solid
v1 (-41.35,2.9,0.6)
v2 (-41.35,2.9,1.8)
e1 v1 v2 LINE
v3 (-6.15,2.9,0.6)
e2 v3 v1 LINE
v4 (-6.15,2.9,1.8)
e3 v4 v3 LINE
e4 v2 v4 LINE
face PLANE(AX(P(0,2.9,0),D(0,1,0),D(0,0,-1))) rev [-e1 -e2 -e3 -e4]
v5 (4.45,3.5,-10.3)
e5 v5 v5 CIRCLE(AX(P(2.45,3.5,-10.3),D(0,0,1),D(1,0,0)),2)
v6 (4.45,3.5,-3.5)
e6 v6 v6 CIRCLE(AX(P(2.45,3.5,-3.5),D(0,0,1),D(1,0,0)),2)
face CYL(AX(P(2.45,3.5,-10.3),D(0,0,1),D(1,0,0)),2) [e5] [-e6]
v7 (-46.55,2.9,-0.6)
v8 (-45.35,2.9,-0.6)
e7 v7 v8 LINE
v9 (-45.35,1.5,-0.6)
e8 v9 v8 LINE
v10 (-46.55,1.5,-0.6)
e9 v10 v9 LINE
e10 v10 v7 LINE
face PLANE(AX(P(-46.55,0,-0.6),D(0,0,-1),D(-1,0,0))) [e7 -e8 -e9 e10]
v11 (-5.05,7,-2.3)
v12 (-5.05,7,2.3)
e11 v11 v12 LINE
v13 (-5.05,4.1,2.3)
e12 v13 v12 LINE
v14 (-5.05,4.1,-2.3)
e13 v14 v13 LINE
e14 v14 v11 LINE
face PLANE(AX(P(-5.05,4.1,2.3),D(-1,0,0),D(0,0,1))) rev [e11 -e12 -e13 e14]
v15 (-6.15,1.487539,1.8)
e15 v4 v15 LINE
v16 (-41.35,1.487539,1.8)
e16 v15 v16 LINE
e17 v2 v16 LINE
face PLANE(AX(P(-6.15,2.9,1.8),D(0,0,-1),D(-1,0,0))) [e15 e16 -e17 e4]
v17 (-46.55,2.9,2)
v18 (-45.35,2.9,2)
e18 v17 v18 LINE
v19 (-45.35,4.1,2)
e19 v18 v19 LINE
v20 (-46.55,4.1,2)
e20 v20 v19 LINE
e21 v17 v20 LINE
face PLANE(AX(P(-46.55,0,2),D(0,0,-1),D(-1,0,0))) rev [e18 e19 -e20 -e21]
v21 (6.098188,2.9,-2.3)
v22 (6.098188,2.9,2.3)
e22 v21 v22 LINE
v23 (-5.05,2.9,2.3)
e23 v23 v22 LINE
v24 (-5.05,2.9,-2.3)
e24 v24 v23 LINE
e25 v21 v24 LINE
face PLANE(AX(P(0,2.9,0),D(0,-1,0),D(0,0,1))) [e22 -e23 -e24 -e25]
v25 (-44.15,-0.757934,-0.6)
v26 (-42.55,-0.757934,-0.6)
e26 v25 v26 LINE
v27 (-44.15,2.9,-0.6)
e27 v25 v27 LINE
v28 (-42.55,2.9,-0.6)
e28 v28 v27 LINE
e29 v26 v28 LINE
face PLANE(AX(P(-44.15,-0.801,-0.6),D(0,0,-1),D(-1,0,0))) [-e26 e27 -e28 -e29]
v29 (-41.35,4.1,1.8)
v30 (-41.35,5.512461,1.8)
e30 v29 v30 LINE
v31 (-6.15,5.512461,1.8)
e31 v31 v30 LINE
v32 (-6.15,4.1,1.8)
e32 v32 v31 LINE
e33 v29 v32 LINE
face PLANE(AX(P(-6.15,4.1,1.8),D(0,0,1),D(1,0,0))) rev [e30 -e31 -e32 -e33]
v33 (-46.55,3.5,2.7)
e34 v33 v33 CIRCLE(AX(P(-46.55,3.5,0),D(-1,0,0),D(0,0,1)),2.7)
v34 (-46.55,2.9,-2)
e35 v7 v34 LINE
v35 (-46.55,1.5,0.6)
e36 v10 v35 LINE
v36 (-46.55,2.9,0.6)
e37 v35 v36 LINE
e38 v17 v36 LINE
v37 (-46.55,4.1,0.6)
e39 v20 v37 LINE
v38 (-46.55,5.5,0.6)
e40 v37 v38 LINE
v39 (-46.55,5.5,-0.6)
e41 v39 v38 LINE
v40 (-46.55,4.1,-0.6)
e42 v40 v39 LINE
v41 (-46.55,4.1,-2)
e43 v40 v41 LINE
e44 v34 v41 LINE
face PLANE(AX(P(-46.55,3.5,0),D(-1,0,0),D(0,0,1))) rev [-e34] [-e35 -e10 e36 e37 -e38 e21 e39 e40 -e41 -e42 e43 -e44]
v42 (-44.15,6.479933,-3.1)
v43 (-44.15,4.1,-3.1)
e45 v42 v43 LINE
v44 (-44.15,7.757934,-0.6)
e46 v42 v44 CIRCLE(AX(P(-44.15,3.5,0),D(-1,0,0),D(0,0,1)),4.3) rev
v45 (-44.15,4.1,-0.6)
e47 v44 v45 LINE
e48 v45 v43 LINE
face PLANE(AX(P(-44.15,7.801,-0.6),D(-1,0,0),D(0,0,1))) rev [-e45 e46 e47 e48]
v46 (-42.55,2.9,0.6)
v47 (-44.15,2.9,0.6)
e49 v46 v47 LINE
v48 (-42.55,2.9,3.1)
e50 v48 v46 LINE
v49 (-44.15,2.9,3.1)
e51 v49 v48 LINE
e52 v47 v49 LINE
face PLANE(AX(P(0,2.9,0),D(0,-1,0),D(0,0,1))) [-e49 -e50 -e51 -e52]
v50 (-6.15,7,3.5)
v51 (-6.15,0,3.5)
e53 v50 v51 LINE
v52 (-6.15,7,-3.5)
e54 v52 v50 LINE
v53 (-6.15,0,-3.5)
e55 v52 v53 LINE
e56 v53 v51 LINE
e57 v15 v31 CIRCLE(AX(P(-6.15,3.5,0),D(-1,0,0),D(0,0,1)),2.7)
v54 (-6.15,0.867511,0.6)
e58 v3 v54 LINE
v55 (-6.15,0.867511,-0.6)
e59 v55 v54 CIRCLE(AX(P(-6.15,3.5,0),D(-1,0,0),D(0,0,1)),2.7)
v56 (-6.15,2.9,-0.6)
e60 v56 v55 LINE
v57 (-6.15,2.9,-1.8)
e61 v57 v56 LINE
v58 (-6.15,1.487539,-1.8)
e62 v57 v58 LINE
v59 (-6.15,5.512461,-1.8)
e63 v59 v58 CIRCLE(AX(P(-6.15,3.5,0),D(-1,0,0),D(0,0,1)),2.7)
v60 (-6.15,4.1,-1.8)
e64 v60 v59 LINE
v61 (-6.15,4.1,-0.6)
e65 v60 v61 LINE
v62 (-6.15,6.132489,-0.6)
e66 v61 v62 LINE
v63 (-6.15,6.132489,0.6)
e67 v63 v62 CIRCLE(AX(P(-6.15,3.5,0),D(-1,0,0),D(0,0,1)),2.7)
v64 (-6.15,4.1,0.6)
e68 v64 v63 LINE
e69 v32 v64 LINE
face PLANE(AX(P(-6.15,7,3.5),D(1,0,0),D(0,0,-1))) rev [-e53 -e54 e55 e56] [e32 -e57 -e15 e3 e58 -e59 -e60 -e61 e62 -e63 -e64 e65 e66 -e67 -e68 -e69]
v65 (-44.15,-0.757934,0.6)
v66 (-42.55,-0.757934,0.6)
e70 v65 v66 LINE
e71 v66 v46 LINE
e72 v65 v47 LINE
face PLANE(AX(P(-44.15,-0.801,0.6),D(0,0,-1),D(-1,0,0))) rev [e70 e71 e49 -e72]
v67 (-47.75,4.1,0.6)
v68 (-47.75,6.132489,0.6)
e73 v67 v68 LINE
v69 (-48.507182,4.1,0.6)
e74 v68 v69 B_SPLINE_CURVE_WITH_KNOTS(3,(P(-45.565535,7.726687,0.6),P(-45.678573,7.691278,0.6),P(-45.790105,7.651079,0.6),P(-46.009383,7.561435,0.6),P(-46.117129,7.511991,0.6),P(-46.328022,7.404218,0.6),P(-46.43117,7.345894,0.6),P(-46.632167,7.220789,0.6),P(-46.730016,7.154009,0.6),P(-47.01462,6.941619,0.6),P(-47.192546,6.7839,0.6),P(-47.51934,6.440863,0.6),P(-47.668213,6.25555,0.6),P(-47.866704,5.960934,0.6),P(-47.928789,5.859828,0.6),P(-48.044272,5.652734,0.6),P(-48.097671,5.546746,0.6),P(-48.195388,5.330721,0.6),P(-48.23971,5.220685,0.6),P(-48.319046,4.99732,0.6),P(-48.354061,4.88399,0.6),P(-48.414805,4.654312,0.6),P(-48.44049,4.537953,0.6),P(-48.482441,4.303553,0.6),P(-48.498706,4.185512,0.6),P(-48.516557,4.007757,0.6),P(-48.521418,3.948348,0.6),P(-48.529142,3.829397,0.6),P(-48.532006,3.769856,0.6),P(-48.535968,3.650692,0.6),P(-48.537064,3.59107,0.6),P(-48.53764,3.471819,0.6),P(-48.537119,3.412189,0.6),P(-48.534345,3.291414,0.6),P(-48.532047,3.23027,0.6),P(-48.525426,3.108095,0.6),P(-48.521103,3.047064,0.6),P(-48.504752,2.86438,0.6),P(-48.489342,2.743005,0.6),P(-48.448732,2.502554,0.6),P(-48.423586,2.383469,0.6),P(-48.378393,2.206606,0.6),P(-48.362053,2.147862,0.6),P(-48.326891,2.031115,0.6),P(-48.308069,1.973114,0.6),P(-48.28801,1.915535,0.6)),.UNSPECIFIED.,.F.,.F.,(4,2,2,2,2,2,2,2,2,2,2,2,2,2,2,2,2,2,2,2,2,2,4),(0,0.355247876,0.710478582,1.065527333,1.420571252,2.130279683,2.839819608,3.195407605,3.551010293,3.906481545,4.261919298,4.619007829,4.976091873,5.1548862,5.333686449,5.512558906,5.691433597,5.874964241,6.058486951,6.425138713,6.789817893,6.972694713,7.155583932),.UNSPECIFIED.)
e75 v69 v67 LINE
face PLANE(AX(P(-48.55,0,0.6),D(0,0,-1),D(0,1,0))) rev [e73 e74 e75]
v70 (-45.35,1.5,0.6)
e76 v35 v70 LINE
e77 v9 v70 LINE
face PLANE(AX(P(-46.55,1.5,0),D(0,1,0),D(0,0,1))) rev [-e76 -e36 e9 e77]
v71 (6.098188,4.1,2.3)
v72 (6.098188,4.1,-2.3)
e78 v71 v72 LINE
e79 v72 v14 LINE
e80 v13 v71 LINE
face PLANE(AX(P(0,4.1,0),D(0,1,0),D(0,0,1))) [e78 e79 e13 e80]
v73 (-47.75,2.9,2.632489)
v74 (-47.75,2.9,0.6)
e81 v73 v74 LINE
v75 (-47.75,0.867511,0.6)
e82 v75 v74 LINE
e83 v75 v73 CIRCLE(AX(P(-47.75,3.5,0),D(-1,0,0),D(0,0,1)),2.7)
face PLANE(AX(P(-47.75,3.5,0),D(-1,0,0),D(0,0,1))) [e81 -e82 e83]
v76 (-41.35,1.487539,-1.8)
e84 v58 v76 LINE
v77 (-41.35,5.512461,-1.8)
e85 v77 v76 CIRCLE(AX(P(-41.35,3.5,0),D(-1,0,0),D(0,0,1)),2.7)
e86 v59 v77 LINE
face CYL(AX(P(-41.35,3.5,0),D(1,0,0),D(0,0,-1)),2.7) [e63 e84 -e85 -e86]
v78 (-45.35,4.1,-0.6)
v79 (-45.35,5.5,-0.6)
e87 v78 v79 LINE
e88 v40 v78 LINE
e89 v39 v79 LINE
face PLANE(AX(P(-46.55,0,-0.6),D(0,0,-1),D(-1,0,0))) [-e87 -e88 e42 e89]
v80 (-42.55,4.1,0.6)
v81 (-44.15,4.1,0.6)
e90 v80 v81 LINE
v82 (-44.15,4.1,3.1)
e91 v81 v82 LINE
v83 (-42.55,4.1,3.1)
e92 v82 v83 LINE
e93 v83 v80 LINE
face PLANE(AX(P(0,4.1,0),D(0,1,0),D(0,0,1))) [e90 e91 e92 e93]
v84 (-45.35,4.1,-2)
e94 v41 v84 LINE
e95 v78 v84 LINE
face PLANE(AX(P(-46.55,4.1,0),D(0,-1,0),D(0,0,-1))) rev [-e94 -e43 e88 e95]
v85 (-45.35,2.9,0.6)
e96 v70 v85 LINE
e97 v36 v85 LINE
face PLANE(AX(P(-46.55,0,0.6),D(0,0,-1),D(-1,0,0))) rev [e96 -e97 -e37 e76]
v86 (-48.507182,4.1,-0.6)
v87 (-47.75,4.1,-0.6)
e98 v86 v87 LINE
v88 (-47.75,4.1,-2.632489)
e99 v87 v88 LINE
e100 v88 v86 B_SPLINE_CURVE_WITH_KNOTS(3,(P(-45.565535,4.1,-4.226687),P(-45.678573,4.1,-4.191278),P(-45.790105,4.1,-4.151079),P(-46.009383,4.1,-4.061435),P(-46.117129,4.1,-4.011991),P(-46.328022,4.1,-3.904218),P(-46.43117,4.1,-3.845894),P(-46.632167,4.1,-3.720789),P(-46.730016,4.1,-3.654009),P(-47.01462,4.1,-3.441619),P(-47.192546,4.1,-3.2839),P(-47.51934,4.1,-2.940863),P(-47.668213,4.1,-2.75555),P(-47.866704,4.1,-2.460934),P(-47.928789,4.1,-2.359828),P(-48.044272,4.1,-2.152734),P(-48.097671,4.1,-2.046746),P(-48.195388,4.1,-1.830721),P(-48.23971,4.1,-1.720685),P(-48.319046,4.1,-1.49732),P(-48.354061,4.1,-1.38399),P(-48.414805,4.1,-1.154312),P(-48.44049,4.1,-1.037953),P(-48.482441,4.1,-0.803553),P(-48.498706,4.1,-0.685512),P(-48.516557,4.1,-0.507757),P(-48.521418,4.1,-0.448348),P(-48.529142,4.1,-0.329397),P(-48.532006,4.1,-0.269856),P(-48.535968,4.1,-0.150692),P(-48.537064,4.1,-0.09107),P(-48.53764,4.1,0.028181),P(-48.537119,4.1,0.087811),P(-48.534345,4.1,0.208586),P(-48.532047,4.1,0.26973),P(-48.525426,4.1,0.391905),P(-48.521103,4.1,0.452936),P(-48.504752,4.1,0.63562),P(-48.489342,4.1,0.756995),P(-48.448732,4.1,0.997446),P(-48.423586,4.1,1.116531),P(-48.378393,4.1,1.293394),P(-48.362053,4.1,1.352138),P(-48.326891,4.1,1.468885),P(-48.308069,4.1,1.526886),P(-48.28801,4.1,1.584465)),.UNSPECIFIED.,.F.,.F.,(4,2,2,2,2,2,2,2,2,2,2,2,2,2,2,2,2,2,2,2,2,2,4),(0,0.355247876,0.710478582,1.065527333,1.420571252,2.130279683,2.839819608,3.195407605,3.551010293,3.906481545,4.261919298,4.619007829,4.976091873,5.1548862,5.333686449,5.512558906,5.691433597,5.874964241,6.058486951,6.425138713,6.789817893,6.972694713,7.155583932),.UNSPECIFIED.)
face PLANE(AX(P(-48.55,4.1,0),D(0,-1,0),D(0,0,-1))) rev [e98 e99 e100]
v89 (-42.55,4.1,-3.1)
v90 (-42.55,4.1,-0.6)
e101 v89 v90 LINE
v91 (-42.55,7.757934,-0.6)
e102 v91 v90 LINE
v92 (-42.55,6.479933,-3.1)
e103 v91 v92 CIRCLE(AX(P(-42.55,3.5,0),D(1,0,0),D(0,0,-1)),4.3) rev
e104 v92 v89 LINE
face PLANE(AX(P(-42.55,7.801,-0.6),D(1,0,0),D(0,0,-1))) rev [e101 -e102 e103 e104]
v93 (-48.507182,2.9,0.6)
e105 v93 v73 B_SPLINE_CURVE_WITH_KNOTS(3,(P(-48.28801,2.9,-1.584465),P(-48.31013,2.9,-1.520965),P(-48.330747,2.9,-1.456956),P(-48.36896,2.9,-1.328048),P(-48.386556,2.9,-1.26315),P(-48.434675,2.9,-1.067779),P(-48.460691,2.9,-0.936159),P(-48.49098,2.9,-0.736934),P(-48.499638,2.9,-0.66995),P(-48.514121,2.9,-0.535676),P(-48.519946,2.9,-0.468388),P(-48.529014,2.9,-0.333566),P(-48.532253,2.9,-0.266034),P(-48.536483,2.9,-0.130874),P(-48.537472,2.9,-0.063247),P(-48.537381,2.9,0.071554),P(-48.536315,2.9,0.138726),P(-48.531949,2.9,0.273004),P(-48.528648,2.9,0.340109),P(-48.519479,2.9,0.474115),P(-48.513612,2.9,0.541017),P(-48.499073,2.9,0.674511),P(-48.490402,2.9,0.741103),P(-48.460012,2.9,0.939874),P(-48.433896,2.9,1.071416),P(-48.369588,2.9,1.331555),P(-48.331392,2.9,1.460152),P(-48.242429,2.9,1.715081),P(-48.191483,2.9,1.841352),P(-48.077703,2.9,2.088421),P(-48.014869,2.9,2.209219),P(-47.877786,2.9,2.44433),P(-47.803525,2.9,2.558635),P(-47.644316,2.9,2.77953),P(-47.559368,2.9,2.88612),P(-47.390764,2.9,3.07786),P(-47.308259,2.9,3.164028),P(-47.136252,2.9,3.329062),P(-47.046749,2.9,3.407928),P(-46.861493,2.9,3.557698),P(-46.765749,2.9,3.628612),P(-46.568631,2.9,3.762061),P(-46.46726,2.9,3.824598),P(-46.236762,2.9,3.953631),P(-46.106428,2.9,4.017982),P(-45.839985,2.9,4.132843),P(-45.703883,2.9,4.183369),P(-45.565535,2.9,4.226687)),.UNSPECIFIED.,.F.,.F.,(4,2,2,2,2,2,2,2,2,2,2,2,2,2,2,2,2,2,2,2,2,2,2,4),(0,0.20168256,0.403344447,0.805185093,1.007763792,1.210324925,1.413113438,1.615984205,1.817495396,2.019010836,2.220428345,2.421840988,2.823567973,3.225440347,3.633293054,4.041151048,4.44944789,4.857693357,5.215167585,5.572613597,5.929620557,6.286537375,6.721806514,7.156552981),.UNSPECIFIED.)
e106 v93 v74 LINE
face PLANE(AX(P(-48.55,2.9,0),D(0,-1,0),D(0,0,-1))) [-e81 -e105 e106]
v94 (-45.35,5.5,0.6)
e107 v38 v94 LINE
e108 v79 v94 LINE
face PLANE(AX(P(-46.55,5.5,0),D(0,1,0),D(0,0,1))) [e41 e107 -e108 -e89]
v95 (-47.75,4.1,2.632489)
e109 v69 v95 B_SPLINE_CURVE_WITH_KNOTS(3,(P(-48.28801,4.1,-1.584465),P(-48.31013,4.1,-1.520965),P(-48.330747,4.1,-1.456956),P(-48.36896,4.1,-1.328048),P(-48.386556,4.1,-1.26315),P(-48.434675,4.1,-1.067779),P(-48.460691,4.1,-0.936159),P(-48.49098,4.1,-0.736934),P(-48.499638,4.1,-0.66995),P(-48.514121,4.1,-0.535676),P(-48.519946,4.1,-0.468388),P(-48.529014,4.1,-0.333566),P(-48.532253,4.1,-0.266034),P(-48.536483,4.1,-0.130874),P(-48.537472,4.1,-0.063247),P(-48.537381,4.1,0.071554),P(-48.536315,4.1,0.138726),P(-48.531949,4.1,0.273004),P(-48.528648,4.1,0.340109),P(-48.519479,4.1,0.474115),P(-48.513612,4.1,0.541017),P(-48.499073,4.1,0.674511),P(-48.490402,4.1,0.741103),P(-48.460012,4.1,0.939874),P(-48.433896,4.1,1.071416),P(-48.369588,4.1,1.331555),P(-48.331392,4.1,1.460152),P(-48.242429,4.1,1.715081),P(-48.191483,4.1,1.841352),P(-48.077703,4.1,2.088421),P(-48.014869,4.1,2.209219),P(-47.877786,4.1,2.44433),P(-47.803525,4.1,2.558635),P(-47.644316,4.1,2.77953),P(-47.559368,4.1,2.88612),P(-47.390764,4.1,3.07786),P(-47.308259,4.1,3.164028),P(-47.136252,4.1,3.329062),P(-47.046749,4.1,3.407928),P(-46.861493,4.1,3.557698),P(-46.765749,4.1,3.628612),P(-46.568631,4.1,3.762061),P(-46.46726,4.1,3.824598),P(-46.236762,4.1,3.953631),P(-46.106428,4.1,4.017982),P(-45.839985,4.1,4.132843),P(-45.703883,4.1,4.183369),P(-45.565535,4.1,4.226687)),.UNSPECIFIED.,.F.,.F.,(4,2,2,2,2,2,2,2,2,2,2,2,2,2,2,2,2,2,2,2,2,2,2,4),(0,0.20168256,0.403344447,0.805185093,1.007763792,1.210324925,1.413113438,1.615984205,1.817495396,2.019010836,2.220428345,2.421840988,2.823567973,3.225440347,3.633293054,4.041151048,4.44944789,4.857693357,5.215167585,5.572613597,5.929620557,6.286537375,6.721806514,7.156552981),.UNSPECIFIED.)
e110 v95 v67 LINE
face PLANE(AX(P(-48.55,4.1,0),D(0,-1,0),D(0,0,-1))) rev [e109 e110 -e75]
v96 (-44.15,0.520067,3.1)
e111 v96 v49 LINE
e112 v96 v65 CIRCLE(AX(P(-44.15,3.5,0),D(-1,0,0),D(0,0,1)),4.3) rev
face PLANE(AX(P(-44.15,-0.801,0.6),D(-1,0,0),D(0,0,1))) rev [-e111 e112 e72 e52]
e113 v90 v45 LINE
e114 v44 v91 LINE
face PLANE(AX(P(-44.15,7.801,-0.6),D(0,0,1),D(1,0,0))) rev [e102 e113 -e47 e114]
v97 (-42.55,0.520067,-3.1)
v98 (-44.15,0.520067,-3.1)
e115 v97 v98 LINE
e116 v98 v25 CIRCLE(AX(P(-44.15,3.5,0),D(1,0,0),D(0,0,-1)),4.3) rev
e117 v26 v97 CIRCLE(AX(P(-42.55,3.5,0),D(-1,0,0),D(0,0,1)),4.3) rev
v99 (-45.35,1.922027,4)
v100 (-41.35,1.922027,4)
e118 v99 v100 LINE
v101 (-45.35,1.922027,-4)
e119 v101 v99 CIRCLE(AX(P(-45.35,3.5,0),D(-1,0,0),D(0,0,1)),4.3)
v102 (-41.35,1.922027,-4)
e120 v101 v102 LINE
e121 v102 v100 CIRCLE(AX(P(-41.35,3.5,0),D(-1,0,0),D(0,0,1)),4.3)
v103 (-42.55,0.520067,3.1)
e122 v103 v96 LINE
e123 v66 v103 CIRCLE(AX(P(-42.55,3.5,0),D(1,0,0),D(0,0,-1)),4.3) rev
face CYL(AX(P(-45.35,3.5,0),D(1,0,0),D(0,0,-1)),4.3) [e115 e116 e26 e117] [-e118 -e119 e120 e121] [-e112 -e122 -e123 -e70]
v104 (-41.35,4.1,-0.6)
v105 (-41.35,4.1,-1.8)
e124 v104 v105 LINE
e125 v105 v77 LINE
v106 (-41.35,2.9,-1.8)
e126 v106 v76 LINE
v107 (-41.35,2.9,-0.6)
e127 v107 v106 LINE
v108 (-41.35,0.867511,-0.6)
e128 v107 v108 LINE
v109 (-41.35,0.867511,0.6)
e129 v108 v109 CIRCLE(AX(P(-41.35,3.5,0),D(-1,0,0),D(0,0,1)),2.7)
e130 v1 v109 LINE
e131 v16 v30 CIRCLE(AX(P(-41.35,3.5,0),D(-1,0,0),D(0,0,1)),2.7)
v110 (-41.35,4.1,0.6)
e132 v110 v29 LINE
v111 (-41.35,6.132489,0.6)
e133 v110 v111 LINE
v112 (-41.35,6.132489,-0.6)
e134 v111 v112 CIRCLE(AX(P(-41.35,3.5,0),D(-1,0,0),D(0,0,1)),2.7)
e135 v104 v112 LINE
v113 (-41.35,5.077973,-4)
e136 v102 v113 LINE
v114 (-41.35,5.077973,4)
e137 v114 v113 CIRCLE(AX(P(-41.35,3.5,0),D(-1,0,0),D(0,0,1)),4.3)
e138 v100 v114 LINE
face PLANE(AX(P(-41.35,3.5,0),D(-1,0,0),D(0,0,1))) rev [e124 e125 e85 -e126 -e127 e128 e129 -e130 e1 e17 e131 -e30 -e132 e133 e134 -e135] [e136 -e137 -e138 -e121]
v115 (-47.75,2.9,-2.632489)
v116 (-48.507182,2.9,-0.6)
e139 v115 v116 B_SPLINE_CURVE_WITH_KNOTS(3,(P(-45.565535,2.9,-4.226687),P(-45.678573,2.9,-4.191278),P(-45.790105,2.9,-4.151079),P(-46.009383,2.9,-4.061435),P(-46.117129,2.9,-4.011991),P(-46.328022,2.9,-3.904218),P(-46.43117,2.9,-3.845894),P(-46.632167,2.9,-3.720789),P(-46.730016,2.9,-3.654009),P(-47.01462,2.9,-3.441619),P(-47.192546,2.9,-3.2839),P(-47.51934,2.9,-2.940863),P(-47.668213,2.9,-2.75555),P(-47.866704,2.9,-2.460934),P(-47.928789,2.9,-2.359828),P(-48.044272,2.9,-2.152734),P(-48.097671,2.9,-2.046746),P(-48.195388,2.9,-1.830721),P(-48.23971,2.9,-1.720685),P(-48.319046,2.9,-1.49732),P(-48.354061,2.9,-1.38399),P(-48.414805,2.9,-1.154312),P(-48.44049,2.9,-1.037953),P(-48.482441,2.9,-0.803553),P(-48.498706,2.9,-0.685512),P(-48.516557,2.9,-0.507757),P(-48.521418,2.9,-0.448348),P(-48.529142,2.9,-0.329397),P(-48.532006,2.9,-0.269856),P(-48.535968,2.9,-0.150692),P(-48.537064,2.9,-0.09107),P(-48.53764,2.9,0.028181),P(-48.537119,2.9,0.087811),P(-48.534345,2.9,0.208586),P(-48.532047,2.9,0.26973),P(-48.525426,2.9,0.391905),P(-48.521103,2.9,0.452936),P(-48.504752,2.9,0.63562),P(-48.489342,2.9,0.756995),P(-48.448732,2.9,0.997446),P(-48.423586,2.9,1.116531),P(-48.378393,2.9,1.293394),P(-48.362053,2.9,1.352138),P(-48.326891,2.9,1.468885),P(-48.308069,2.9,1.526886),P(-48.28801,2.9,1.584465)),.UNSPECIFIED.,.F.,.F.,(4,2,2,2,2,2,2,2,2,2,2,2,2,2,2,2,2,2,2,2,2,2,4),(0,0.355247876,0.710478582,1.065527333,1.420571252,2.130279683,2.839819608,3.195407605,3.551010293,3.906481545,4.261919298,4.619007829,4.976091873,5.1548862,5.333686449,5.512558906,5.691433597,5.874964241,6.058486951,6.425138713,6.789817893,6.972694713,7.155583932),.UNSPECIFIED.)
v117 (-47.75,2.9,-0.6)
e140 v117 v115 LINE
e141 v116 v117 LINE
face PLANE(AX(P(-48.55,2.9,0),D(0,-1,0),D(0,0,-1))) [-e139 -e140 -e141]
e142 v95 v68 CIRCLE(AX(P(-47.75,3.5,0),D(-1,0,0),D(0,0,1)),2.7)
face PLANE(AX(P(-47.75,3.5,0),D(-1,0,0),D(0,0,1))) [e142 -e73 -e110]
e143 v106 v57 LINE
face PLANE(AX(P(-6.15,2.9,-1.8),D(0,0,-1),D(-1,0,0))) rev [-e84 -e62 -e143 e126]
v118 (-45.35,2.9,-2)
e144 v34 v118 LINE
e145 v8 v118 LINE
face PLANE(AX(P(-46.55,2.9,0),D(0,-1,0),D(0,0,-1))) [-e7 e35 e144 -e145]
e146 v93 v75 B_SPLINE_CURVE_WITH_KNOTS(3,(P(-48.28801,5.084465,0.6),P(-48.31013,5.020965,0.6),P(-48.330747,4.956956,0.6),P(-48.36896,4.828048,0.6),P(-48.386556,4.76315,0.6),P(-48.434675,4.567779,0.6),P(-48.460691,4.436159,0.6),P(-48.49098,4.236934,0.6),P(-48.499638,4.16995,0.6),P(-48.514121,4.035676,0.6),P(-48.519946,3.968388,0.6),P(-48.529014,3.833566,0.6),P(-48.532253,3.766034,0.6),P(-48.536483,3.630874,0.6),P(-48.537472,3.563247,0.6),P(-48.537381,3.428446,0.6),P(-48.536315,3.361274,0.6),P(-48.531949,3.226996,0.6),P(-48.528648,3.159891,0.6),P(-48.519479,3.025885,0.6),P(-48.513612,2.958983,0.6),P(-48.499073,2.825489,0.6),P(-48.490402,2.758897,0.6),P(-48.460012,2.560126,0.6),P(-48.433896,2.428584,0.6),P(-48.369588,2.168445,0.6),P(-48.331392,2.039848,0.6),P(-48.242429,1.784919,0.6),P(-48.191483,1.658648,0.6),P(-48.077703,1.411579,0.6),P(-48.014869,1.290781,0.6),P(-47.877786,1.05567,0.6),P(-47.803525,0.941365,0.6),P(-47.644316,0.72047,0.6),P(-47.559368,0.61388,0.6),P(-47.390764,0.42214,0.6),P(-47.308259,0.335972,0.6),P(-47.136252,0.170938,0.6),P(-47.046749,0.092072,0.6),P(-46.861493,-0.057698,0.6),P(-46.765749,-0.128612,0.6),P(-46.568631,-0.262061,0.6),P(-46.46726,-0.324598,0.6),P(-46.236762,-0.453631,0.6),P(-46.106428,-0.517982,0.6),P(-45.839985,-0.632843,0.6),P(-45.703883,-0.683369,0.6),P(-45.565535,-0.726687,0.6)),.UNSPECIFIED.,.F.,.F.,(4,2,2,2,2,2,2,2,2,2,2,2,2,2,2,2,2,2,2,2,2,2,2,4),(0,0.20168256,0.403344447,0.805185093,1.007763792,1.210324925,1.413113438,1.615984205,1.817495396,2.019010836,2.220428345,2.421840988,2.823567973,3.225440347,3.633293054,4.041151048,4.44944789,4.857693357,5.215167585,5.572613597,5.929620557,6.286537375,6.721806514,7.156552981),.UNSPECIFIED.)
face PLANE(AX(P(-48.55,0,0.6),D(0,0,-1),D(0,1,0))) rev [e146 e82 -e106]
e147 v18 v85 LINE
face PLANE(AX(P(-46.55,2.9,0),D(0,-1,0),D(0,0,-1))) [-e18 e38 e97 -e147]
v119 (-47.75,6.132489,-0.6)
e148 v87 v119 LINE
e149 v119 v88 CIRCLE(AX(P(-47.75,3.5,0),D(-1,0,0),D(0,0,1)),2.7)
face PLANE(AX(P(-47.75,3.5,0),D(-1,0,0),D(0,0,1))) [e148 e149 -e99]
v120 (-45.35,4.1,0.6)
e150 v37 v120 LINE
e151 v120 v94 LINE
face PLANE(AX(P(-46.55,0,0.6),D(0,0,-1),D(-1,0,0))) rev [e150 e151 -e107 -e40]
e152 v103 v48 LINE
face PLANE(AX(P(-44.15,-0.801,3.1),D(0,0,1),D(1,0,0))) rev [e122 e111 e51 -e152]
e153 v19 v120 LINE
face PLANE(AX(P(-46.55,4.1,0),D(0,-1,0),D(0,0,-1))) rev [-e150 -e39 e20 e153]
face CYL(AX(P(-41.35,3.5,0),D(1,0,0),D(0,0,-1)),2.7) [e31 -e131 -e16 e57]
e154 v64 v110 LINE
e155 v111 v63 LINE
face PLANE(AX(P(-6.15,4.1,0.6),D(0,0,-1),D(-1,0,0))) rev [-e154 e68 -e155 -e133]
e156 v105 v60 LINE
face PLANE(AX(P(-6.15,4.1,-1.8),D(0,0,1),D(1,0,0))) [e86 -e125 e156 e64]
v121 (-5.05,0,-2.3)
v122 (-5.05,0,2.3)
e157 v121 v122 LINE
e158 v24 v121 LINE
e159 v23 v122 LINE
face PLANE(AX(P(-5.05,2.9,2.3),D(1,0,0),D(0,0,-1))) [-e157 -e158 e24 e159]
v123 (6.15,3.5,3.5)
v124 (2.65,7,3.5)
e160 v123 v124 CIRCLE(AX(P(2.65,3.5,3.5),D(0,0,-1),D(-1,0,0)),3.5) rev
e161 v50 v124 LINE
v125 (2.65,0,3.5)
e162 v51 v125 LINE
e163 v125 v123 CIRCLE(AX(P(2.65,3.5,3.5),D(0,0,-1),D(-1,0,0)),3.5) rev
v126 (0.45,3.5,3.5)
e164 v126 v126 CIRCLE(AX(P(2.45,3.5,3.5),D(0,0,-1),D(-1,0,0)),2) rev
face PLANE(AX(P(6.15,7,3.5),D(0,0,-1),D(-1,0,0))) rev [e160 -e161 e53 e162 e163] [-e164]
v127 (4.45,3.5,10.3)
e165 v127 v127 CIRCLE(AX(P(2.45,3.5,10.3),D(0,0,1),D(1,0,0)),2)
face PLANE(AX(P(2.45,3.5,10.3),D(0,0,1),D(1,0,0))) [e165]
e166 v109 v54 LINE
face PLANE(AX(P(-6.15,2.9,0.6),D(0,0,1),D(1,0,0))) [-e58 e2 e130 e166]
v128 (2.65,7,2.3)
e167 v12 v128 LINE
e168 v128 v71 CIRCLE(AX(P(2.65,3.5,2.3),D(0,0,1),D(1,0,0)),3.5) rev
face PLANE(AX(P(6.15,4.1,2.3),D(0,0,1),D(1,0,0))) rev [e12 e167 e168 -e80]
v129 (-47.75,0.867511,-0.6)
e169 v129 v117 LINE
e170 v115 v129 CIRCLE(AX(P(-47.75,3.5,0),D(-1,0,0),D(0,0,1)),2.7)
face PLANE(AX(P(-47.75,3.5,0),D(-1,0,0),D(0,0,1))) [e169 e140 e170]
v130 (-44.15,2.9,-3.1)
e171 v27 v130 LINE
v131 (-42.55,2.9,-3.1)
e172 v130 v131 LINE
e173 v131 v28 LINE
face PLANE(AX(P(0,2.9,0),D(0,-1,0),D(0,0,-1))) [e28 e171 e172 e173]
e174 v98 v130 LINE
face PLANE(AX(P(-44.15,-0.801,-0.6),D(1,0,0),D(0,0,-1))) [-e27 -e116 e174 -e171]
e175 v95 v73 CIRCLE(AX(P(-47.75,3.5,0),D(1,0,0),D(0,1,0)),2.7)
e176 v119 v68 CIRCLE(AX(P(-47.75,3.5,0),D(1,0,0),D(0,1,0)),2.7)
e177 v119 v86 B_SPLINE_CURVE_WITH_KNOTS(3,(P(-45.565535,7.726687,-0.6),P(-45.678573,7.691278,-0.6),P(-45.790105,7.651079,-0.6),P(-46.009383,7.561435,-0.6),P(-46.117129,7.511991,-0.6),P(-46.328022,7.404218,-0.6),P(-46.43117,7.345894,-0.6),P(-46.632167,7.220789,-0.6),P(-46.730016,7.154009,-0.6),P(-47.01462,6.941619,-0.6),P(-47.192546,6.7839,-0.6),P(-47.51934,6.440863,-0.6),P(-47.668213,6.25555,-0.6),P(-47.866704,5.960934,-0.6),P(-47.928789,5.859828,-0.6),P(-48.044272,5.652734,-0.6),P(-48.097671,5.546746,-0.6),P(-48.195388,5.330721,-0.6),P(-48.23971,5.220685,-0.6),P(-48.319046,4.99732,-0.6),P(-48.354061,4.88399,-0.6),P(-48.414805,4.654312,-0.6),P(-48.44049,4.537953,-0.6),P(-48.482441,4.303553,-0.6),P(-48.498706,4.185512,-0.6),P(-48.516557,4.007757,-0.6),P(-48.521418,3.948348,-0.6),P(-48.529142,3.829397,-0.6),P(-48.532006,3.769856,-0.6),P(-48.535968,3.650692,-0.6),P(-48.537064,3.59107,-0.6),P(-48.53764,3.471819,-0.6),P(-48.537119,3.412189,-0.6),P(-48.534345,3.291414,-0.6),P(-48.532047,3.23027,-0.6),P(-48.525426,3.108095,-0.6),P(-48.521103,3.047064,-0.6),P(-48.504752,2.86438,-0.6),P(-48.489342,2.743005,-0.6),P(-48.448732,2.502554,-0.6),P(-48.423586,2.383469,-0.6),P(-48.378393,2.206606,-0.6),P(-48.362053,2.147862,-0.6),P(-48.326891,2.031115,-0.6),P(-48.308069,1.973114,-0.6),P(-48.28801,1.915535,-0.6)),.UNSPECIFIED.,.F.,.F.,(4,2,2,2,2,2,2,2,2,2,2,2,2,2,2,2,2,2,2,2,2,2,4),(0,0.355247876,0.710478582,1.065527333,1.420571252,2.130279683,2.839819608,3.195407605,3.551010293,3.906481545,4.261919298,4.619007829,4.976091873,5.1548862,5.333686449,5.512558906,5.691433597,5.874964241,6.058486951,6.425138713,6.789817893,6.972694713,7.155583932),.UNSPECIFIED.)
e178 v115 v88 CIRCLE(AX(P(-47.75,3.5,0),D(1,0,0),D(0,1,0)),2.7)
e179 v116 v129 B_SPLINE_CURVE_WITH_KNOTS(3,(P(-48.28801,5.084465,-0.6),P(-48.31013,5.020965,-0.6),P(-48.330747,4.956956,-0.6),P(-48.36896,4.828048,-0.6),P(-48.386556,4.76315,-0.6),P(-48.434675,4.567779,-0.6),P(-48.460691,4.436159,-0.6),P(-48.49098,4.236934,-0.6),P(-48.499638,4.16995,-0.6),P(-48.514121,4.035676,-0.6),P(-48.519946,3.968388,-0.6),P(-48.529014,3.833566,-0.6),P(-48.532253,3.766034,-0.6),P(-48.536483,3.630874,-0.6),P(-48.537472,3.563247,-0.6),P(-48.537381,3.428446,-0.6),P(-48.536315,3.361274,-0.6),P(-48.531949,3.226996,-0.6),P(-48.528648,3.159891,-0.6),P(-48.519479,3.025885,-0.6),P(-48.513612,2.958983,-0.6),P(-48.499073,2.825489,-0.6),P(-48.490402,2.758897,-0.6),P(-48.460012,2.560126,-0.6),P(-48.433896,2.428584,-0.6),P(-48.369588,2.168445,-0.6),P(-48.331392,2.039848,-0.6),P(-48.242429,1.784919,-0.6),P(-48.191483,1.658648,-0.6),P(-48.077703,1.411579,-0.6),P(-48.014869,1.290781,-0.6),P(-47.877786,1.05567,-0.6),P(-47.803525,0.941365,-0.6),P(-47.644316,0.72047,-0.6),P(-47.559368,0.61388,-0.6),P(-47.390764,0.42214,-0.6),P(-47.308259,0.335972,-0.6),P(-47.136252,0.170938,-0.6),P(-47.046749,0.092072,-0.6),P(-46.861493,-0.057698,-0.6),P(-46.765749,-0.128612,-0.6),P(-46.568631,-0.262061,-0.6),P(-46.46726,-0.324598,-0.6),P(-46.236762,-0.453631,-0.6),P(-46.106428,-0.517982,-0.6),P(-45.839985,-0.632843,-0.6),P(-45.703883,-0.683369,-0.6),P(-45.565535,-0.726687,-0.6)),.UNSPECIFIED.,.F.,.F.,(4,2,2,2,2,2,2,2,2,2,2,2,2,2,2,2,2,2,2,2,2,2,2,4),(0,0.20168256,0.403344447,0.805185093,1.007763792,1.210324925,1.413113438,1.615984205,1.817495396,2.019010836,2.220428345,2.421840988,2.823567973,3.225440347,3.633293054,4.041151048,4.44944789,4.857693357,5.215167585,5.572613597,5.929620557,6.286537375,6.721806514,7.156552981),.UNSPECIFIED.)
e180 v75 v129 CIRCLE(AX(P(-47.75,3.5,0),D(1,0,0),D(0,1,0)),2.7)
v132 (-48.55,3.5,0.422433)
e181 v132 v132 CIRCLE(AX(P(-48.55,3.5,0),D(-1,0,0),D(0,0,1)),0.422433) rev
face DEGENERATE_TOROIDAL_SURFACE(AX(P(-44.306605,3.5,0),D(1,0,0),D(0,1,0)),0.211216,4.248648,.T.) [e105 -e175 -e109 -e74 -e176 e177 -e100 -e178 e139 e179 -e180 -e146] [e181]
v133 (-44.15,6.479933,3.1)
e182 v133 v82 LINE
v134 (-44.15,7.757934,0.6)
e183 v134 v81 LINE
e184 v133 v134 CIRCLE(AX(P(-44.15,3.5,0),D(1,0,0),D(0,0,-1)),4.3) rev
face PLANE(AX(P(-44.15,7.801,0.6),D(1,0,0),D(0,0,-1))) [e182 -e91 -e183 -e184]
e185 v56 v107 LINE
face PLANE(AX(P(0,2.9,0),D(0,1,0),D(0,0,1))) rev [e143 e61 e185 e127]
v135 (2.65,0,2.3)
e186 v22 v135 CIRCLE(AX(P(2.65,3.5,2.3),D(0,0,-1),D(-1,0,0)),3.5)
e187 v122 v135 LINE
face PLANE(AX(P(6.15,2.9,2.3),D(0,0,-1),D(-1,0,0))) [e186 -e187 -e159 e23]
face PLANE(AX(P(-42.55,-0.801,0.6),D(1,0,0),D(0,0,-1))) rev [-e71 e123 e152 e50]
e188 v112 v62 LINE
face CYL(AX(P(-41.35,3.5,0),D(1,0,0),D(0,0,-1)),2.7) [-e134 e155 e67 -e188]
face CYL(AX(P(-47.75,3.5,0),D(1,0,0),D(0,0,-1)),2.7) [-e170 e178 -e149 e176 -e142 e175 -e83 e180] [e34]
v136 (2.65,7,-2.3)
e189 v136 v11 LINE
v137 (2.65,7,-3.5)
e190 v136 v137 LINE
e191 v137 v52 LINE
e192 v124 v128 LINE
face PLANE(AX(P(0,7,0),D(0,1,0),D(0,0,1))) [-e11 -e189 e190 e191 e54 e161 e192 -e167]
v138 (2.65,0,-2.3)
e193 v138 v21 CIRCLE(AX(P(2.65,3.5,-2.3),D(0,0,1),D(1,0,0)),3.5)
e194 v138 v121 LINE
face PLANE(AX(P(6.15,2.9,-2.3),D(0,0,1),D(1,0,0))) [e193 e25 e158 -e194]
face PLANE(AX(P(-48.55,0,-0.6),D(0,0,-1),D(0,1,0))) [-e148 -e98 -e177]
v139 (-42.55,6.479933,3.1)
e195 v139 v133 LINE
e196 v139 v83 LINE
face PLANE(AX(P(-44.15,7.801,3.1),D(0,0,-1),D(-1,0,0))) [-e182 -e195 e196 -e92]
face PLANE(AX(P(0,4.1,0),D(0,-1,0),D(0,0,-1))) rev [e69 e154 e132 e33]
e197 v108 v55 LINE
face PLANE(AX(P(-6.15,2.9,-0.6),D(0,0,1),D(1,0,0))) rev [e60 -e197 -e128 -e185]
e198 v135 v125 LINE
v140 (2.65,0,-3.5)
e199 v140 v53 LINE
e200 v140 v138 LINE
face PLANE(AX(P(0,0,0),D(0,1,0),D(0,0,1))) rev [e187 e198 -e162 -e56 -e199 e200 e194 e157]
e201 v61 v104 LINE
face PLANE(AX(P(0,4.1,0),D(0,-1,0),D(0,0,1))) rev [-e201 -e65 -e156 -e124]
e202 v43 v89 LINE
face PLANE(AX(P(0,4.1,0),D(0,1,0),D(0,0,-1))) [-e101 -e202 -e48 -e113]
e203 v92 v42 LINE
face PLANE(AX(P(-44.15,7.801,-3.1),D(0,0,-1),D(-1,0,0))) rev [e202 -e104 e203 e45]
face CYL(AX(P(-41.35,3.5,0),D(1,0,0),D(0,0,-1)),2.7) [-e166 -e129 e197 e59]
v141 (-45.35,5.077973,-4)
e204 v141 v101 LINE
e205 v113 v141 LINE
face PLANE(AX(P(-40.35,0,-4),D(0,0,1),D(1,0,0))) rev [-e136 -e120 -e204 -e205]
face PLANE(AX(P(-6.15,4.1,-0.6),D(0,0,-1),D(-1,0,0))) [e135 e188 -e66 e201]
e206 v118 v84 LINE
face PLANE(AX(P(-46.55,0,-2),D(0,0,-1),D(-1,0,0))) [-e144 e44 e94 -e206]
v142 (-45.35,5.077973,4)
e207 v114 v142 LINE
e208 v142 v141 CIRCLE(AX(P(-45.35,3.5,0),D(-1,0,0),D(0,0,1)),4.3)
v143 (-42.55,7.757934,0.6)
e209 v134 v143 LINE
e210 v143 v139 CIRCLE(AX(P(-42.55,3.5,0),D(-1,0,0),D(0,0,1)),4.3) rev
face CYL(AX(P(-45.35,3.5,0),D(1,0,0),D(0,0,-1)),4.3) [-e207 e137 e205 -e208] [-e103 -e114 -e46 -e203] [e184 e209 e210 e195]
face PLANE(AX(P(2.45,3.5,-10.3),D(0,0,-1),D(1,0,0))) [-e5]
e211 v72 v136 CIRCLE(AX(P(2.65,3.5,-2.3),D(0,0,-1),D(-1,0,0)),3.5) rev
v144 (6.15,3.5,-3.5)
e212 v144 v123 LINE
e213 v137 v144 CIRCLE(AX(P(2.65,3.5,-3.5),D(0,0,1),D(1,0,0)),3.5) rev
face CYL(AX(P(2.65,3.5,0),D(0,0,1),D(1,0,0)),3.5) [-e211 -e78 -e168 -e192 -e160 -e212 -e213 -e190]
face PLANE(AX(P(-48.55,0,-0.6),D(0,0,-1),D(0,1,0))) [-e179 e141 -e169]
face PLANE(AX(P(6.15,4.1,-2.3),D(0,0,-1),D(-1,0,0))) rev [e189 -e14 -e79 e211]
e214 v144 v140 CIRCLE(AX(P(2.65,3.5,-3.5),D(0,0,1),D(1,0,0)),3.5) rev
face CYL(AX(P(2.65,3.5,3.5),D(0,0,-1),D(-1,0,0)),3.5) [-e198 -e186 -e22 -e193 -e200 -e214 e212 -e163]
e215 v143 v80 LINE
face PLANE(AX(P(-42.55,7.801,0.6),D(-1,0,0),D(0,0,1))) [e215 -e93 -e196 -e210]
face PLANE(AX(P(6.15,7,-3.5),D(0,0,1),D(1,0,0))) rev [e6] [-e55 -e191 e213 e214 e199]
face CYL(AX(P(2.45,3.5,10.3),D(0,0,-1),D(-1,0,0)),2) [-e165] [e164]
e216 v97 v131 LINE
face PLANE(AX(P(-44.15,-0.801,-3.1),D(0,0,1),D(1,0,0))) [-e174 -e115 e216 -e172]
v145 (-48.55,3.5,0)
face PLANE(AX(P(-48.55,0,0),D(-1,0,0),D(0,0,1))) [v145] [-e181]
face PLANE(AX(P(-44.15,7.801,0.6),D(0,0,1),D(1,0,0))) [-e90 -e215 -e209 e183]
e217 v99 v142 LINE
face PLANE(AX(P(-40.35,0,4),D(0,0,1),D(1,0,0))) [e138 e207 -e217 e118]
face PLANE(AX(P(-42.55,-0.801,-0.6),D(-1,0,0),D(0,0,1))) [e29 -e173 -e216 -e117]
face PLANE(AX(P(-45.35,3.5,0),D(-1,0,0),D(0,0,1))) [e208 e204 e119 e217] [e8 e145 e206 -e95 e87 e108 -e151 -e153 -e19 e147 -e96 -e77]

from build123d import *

# Parameters (mm, degrees)
SKETCH1_W                 = 12.3
SKETCH1_H                 = 7
BOSS_EXTRUDE1_DEPTH       = 7
SKETCH2_W                 = 11.2
SKETCH2_H                 = 4.6
CUT_EXTRUDE1_DEPTH        = 2.9
SKETCH4_R                 = 2
BOSS_EXTRUDE2_DEPTH       = 6.8
SKETCH5_R                 = 2.7
BOSS_EXTRUDE3_DEPTH       = 35.2
SKETCH6_R                 = 4.3
BOSS_EXTRUDE4_DEPTH       = 4
SKETCH7_W                 = 35.2
SKETCH7_H                 = 1.2
CUT_EXTRUDE2_DEPTH        = 2.9
MIRROR4_COPY_1_SKETCH_W   = 35.2
MIRROR4_COPY_1_SKETCH_H   = 1.2
MIRROR4_COPY_1_DEPTH      = 2.9
CUT_EXTRUDE3_REACH        = 48.762
CUT_EXTRUDE3_END_RADIUS   = 4.3
SKETCH9_W                 = 1.6
SKETCH9_H                 = 2.5
MIRROR6_COPY_1_REACH      = 48.762
MIRROR6_COPY_1_END_RADIUS = 4.3
MIRROR6_COPY_1_SKETCH_W   = 1.6
MIRROR6_COPY_1_SKETCH_H   = 2.5
SKETCH10_W                = 1.4
SKETCH10_H                = 1.2
SKETCH10_W_2              = 1.2
SKETCH10_H_2              = 1.4
BOSS_EXTRUDE5_DEPTH       = 1.2
SKETCH11_R                = 2.7
BOSS_EXTRUDE6_DEPTH       = 1.2
SKETCH12_W                = 1.2
SKETCH12_H                = 1.2
BOSS_EXTRUDE9_DEPTH       = 0.8
FILLET3_R                 = 3.5
SKETCH14_W                = 1
SKETCH14_H                = 12
CUT_EXTRUDE8_DEPTH        = 5


with BuildPart() as part:
    # Sketch1 → Boss-Extrude1 (new body)
    with BuildSketch(Plane(origin=(0, 0, 0), x_dir=(1, 0, 0), z_dir=(0, 1, 0))):
        Rectangle(SKETCH1_W, SKETCH1_H)
    extrude(amount=BOSS_EXTRUDE1_DEPTH)

    # Sketch2 → Cut-Extrude1 (cut)
    with BuildSketch(Plane(origin=(0, 7, 0), x_dir=(1, 0, 0), z_dir=(0, 1, 0))):
        with Locations((0.55, 0)):
            Rectangle(SKETCH2_W, SKETCH2_H)
    cut_extrude1 = extrude(amount=-CUT_EXTRUDE1_DEPTH, mode=Mode.SUBTRACT)

    # Mirror1: Cut-Extrude1 across plane
    add(cut_extrude1.mirror(Plane.ZX.offset(3.5)), mode=Mode.SUBTRACT)

    # Sketch4 → Boss-Extrude2 (add)
    with BuildSketch(Plane.XY.offset(3.5)):
        with Locations(Location((2.45, 3.5, 0), (0, 0, 180))):
            Circle(SKETCH4_R)
    boss_extrude2 = extrude(amount=BOSS_EXTRUDE2_DEPTH)

    # Mirror2: Boss-Extrude2 across plane
    add(boss_extrude2.mirror(Plane.XY))

    # Sketch5 → Boss-Extrude3 (add)
    with BuildSketch(Plane.ZY.offset(6.15)):
        with Locations((0, 3.5)):
            Circle(SKETCH5_R)
    extrude(amount=BOSS_EXTRUDE3_DEPTH)

    # Sketch6 → Boss-Extrude4 (add)
    with BuildSketch(Plane.ZY.offset(41.35)):
        with Locations((0, 3.5)):
            Circle(SKETCH6_R)
    extrude(amount=BOSS_EXTRUDE4_DEPTH)

    # Sketch7 → Cut-Extrude2 (cut)
    with BuildSketch(Plane(origin=(0, 0, 0), x_dir=(-1, 0, 0), z_dir=(0, -1, 0))):
        with Locations((23.75, 1.2)):
            Rectangle(SKETCH7_W, SKETCH7_H)
    cut_extrude2 = extrude(amount=-CUT_EXTRUDE2_DEPTH, mode=Mode.SUBTRACT)

    # Mirror3: Cut-Extrude2 across plane
    add(cut_extrude2.mirror(Plane.ZX.offset(3.5)), mode=Mode.SUBTRACT)

    # Mirror4: Cut-Extrude2 across plane
    add(cut_extrude2.mirror(Plane.XY), mode=Mode.SUBTRACT)

    # Mirror4 copy 1 sketch → Mirror4 copy 1 (cut)
    with BuildSketch(Plane(origin=(0, 7, 0), x_dir=(-1, 0, 0), z_dir=(0, 1, 0))):
        with Locations((23.75, 1.2)):
            Rectangle(MIRROR4_COPY_1_SKETCH_W, MIRROR4_COPY_1_SKETCH_H)
    extrude(amount=-MIRROR4_COPY_1_DEPTH, mode=Mode.SUBTRACT)

    # Cut-Extrude3: up to this cylinder (the profile starts inside it)
    cut_extrude3_end = Plane(origin=(-43.35, 3.5, 0), z_dir=(1, 0, 0)) * Cylinder(CUT_EXTRUDE3_END_RADIUS, 107.124, mode=Mode.PRIVATE)
    # Sketch9 → Cut-Extrude3 (cut, up to the surface)
    with BuildSketch(Plane(origin=(0, 4.1, 0), x_dir=(1, 0, 0), z_dir=(0, 1, 0)), mode=Mode.PRIVATE) as cut_extrude3_sk1:
        with Locations((-43.35, -1.85)):
            Rectangle(SKETCH9_W, SKETCH9_H)
    cut_extrude3_tool1 = extrude(cut_extrude3_sk1.sketch, amount=CUT_EXTRUDE3_REACH, mode=Mode.PRIVATE) & cut_extrude3_end
    cut_extrude3 = cut_extrude3_tool1.solids().sort_by_distance((-43.35, 4.1, 1.85))[0]
    add(cut_extrude3, mode=Mode.SUBTRACT)

    # Mirror5: Cut-Extrude3 across plane
    add(cut_extrude3.mirror(Plane.ZX.offset(3.5)), mode=Mode.SUBTRACT)

    # Mirror6: Cut-Extrude3 across plane
    add(cut_extrude3.mirror(Plane.XY), mode=Mode.SUBTRACT)

    # Mirror6 copy 1: up to this cylinder (the profile starts inside it)
    mirror6_copy_1_end = Plane(origin=(-43.35, 3.5, 0), z_dir=(1, 0, 0)) * Cylinder(MIRROR6_COPY_1_END_RADIUS, 107.124, mode=Mode.PRIVATE)
    # Mirror6 copy 1 sketch → Mirror6 copy 1 (cut, up to the surface)
    with BuildSketch(Plane.XZ.offset(-2.9), mode=Mode.PRIVATE) as mirror6_copy_1_sk1:
        with Locations((-43.35, -1.85)):
            Rectangle(MIRROR6_COPY_1_SKETCH_W, MIRROR6_COPY_1_SKETCH_H)
    mirror6_copy_1_tool1 = extrude(mirror6_copy_1_sk1.sketch, amount=MIRROR6_COPY_1_REACH, mode=Mode.PRIVATE) & mirror6_copy_1_end
    add(mirror6_copy_1_tool1.solids().sort_by_distance((-43.35, 4.1, 1.85))[0], mode=Mode.SUBTRACT)

    # Sketch10 → Boss-Extrude5 (add)
    with BuildSketch(Plane.ZY.offset(45.35)):
        with Locations((1.3, 3.5)):
            Rectangle(SKETCH10_W, SKETCH10_H)
        with Locations((0, 2.2)):
            Rectangle(SKETCH10_W_2, SKETCH10_H_2)
        with Locations((-1.3, 3.5)):
            Rectangle(SKETCH10_W, SKETCH10_H)
        with Locations((0, 4.8)):
            Rectangle(SKETCH10_W_2, SKETCH10_H_2)
        with Locations((0, 3.5)):
            Rectangle(SKETCH10_W_2, SKETCH10_H)
    extrude(amount=BOSS_EXTRUDE5_DEPTH)

    # Sketch11 → Boss-Extrude6 (add)
    with BuildSketch(Plane.ZY.offset(46.55)):
        with Locations((0, 3.5)):
            Circle(SKETCH11_R)
    extrude(amount=BOSS_EXTRUDE6_DEPTH)

    # Sketch12 → Boss-Extrude9 (add)
    with BuildSketch(Plane.ZY.offset(47.75)):
        with BuildLine():
            Line((-2.632489316, 2.9), (-0.6, 2.9))
            Line((-0.6, 2.9), (-0.6, 4.1))
            Line((-0.6, 4.1), (-2.632489316, 4.1))
            ThreePointArc((-2.632489316, 4.1), (-2.683069246, 3.801893066), (-2.7, 3.5))
            ThreePointArc((-2.7, 3.5), (-2.683069246, 3.198106934), (-2.632489316, 2.9))
        make_face()
        with BuildLine():
            Line((-0.6, 4.1), (0.6, 4.1))
            Line((0.6, 4.1), (0.6, 6.132489316))
            ThreePointArc((0.6, 6.132489316), (0.301893066, 6.183069246), (0, 6.2))
            ThreePointArc((0, 6.2), (-0.301893066, 6.183069246), (-0.6, 6.132489316))
            Line((-0.6, 6.132489316), (-0.6, 4.1))
        make_face()
        with BuildLine():
            Line((0.6, 2.9), (2.632489316, 2.9))
            ThreePointArc((2.632489316, 2.9), (2.683069246, 3.198106934), (2.7, 3.5))
            ThreePointArc((2.7, 3.5), (2.683069246, 3.801893066), (2.632489316, 4.1))
            Line((2.632489316, 4.1), (0.6, 4.1))
            Line((0.6, 4.1), (0.6, 2.9))
        make_face()
        with BuildLine():
            Line((0.6, 0.867510684), (0.6, 2.9))
            Line((0.6, 2.9), (-0.6, 2.9))
            Line((-0.6, 2.9), (-0.6, 0.867510684))
            ThreePointArc((-0.6, 0.867510684), (-0.301893067, 0.816930754), (-2e-09, 0.8))
            ThreePointArc((-2e-09, 0.8), (0.301893065, 0.816930754), (0.6, 0.867510684))
        make_face()
        with Locations((0, 3.5)):
            Rectangle(SKETCH12_W, SKETCH12_H)
    extrude(amount=BOSS_EXTRUDE9_DEPTH)

    # Sketch13 → Cut-Revolve6 (revolve, cut)
    with BuildSketch(Plane.XY, mode=Mode.PRIVATE) as cut_revolve6_sk:
        with BuildLine():
            Line((-47.75, 6.2), (-50.26441212, 6.868281128))
            Line((-50.26441212, 6.868281128), (-50.691294746, 5.219710686))
            Line((-50.691294746, 5.219710686), (-49.924832778, 3.5))
            Line((-49.924832778, 3.5), (-48.55, 3.5))
            ThreePointArc((-48.55, 3.5), (-48.380201095, 4.918207732), (-47.75, 6.2))
        make_face()
    revolve(cut_revolve6_sk.sketch.rotate(Axis((-48.75, 3.5, 0), (-1, 0, 0)), 77.160411593), axis=Axis((-48.75, 3.5, 0), (-1, 0, 0)), mode=Mode.SUBTRACT)

    # Fillet3
    fillet3_edges = [part.edges().sort_by_distance(p)[0] for p in [
        (6.15, 0, 2.9),
        (6.15, 7, 2.9),
    ]]
    fillet(fillet3_edges, radius=FILLET3_R - 0.0001)  # a hair under: the kernel refuses the full size

    # Sketch14 → Cut-Extrude8 (cut)
    with BuildSketch(Plane.ZY.offset(45.35)):
        with Locations((-4.5, 3.5)):
            Rectangle(SKETCH14_W, SKETCH14_H)
        with Locations((4.5, 3.5)):
            Rectangle(SKETCH14_W, SKETCH14_H)
    extrude(amount=-CUT_EXTRUDE8_DEPTH, mode=Mode.SUBTRACT)


solid = part.part
